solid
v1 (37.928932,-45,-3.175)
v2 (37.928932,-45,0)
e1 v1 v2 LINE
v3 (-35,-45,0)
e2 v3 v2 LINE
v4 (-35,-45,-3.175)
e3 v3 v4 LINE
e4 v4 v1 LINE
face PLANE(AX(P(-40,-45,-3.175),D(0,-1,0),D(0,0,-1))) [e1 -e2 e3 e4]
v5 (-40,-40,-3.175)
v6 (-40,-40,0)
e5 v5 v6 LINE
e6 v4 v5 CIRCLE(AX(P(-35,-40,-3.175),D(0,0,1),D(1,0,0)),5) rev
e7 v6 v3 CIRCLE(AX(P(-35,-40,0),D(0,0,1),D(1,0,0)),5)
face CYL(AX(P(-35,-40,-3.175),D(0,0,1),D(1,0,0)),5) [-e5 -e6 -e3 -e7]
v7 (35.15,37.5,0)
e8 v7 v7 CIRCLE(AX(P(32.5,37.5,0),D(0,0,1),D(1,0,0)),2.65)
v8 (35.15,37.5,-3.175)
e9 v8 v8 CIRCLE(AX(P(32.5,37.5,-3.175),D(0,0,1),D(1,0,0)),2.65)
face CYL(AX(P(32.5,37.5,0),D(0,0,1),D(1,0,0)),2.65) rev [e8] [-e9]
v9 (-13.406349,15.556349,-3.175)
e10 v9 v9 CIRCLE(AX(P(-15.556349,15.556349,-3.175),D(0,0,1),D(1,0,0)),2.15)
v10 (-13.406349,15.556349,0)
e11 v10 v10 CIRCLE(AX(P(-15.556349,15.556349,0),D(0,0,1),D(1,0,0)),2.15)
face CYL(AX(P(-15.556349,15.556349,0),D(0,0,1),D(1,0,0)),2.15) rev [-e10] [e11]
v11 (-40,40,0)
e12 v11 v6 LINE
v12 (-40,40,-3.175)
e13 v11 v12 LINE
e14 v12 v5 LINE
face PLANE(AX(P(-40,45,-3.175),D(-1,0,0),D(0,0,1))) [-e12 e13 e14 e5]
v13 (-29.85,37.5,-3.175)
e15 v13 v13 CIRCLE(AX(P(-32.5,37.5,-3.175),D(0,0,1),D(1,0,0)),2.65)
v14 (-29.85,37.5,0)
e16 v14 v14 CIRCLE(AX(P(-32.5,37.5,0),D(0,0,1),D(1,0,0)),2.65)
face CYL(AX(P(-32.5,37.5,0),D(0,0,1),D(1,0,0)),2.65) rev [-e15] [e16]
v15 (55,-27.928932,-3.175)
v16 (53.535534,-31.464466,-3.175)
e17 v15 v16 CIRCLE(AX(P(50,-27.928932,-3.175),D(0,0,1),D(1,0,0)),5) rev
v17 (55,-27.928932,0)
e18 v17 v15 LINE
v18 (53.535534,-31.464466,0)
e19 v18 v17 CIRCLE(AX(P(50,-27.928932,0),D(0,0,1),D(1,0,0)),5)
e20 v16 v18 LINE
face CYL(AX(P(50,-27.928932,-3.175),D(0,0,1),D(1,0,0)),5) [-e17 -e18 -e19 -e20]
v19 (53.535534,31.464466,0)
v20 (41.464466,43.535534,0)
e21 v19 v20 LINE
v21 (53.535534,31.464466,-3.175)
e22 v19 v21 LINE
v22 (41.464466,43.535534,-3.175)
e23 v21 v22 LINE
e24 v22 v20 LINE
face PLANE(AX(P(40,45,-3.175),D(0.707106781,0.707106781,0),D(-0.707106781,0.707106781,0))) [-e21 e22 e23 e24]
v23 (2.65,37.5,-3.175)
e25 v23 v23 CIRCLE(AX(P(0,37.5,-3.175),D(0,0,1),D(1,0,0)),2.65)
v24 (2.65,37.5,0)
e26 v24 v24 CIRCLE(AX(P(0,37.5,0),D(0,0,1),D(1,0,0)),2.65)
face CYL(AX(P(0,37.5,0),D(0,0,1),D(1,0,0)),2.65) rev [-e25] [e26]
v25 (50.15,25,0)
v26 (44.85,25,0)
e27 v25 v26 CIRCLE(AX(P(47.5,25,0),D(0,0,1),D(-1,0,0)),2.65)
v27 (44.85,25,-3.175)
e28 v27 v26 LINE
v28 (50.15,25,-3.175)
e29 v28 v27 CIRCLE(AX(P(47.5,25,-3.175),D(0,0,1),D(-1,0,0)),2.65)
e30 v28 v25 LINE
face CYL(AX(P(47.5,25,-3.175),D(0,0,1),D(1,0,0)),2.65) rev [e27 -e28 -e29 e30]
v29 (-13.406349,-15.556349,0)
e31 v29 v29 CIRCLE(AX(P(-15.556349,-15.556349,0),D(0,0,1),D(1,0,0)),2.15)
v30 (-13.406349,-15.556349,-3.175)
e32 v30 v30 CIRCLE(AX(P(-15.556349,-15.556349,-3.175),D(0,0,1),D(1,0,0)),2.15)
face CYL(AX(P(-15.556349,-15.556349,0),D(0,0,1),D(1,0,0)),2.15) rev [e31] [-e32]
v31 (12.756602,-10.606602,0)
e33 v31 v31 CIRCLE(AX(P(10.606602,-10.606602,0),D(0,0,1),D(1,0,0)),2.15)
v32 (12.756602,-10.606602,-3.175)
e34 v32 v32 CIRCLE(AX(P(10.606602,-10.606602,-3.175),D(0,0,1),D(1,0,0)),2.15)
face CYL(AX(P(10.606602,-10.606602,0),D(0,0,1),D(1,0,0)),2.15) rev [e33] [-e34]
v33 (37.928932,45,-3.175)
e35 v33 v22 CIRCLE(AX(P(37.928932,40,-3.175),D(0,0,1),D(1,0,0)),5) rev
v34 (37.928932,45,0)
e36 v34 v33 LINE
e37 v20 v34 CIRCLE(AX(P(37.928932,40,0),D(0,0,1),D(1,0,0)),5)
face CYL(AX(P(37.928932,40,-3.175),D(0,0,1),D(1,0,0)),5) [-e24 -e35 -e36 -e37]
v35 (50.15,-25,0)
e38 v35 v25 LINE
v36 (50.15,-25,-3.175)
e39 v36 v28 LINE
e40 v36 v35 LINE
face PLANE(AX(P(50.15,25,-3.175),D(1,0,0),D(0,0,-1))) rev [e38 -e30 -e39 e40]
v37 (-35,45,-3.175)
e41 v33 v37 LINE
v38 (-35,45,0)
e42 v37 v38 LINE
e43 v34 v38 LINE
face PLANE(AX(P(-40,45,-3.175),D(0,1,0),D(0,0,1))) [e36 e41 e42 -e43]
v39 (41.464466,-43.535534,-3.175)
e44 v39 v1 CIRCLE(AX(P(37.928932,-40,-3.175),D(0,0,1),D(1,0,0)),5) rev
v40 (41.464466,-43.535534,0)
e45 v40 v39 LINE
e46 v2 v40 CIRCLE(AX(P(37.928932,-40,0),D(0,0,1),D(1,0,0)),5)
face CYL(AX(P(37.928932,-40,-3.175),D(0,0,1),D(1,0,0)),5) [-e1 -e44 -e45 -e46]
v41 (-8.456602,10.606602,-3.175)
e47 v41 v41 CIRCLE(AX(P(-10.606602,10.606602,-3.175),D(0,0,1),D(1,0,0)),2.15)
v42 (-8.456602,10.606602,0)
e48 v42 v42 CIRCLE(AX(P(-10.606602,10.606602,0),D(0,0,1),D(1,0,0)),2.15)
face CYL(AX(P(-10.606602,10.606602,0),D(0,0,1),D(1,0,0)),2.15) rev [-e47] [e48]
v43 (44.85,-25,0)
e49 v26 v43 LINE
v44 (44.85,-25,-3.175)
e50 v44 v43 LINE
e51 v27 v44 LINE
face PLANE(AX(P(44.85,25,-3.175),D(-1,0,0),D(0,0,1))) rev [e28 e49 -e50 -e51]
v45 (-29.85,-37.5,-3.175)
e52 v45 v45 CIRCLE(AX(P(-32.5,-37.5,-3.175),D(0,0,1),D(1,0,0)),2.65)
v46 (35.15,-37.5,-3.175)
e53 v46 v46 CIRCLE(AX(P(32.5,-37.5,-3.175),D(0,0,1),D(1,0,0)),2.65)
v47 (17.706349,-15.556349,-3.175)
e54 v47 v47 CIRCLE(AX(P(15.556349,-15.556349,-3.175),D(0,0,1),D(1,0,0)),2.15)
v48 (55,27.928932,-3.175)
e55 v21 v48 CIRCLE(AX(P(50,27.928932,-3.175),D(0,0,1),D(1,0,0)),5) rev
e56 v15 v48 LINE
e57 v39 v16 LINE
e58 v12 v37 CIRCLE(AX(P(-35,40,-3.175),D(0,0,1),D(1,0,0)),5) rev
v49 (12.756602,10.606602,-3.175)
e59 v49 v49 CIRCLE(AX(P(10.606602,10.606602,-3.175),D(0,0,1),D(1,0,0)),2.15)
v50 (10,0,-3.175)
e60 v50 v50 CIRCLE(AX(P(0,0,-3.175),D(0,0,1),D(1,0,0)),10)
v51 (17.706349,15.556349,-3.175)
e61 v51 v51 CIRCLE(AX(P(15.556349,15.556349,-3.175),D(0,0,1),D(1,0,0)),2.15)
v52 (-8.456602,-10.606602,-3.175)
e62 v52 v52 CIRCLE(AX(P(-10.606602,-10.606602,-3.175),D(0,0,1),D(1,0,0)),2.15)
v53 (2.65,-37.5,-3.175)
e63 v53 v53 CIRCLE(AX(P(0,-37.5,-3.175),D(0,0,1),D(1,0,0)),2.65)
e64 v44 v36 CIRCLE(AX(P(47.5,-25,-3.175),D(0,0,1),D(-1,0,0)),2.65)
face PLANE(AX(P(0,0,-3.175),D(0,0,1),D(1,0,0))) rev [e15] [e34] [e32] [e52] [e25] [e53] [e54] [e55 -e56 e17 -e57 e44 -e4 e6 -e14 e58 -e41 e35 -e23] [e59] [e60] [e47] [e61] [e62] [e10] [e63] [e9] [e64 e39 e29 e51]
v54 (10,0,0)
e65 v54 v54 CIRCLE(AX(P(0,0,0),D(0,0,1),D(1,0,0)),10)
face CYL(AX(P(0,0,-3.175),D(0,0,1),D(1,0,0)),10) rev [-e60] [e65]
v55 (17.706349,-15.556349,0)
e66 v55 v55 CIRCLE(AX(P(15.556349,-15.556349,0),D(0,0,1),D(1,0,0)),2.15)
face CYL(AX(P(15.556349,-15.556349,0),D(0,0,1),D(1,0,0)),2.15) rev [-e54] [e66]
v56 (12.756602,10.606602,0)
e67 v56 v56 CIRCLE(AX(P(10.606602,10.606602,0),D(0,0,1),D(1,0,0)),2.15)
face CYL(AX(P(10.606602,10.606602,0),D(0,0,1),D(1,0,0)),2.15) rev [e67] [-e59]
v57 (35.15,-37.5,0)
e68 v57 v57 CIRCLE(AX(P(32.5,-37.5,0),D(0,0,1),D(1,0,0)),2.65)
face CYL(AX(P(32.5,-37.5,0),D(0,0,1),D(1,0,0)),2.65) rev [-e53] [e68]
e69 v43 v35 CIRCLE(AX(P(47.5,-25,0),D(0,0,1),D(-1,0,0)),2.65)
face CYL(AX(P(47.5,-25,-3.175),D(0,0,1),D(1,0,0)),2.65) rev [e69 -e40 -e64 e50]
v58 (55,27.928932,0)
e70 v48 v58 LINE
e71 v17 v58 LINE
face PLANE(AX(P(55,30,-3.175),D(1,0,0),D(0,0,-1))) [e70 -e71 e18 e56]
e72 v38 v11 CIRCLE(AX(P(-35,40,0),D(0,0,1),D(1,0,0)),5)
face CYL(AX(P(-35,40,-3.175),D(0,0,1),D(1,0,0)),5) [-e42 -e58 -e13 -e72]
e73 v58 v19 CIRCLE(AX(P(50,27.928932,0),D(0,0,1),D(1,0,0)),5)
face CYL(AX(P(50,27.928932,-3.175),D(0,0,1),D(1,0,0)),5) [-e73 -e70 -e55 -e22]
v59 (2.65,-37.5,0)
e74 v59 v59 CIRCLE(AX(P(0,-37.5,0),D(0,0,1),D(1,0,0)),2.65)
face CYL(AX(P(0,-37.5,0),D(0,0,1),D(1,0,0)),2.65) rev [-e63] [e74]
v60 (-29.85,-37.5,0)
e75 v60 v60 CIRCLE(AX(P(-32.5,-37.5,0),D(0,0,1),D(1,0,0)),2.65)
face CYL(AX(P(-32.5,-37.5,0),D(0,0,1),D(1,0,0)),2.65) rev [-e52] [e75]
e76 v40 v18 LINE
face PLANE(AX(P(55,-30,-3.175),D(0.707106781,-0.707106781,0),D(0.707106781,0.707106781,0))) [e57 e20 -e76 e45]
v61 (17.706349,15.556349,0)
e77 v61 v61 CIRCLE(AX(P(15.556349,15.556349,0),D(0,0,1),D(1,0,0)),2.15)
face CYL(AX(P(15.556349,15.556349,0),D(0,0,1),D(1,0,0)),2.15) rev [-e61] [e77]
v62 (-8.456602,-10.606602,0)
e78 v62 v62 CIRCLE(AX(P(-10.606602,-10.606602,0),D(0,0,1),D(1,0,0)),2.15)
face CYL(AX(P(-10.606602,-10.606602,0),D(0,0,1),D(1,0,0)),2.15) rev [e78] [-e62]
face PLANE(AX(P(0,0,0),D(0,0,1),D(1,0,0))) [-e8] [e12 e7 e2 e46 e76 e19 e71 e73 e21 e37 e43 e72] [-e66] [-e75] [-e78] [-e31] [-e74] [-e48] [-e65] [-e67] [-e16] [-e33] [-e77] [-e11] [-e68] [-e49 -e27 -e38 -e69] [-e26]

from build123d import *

# Parameters (mm, degrees)
SKETCH1_R            = 10
BASE_FLANGE1_DEPTH   = 3.175
M4_CLEARANCE_HOLE1_D = 4.3
M5_CLEARANCE_HOLE1_D = 5.3
FILLET1_R            = 5


# Sheet-metal steps are written as plain solids
with BuildPart() as part:
    # Sketch1 → Base-Flange1 (new body)
    with BuildSketch(Plane.XY):
        Polygon((40, 45), (55, 30), (55, -30), (40, -45), (-40, -45), (-40, 45), align=None)
        Circle(SKETCH1_R, mode=Mode.SUBTRACT)
        with BuildLine():
            Line((44.85, 25), (44.85, -25))
            ThreePointArc((44.85, -25), (47.5, -27.65), (50.15, -25))
            Line((50.15, -25), (50.15, 25))
            ThreePointArc((50.15, 25), (47.5, 27.65), (44.85, 25))
        make_face(mode=Mode.SUBTRACT)
    extrude(amount=-BASE_FLANGE1_DEPTH)

    # M4 Clearance Hole1 (through all)
    with Locations(Plane(origin=(-15.556349186, 15.556349186, 0), x_dir=(1, 0, 0), z_dir=(0, 0, 1))):
        with Locations((0, 0), (31.112698372, 0), (26.162950904, -4.949747468), (4.949747468, -4.949747468), (0, -31.112698372), (31.112698372, -31.112698372), (26.162950904, -26.162950904), (4.949747468, -26.162950904)):
            Hole(M4_CLEARANCE_HOLE1_D / 2)

    # M5 Clearance Hole1 (through all)
    with Locations(Plane(origin=(-32.5, 37.5, 0), x_dir=(1, 0, 0), z_dir=(0, 0, 1))):
        with Locations((0, 0), (65, 0), (65, -75), (0, -75), (32.5, 0), (32.5, -75)):
            Hole(M5_CLEARANCE_HOLE1_D / 2)

    # Fillet1
    fillet1_edges = [part.edges().sort_by_distance(p)[0] for p in [
        (-40, 45, -1.5875),
        (40, 45, -1.5875),
        (55, 30, -1.5875),
        (55, -30, -1.5875),
        (40, -45, -1.5875),
        (-40, -45, -1.5875),
    ]]
    fillet(fillet1_edges, radius=FILLET1_R)


solid = part.part
